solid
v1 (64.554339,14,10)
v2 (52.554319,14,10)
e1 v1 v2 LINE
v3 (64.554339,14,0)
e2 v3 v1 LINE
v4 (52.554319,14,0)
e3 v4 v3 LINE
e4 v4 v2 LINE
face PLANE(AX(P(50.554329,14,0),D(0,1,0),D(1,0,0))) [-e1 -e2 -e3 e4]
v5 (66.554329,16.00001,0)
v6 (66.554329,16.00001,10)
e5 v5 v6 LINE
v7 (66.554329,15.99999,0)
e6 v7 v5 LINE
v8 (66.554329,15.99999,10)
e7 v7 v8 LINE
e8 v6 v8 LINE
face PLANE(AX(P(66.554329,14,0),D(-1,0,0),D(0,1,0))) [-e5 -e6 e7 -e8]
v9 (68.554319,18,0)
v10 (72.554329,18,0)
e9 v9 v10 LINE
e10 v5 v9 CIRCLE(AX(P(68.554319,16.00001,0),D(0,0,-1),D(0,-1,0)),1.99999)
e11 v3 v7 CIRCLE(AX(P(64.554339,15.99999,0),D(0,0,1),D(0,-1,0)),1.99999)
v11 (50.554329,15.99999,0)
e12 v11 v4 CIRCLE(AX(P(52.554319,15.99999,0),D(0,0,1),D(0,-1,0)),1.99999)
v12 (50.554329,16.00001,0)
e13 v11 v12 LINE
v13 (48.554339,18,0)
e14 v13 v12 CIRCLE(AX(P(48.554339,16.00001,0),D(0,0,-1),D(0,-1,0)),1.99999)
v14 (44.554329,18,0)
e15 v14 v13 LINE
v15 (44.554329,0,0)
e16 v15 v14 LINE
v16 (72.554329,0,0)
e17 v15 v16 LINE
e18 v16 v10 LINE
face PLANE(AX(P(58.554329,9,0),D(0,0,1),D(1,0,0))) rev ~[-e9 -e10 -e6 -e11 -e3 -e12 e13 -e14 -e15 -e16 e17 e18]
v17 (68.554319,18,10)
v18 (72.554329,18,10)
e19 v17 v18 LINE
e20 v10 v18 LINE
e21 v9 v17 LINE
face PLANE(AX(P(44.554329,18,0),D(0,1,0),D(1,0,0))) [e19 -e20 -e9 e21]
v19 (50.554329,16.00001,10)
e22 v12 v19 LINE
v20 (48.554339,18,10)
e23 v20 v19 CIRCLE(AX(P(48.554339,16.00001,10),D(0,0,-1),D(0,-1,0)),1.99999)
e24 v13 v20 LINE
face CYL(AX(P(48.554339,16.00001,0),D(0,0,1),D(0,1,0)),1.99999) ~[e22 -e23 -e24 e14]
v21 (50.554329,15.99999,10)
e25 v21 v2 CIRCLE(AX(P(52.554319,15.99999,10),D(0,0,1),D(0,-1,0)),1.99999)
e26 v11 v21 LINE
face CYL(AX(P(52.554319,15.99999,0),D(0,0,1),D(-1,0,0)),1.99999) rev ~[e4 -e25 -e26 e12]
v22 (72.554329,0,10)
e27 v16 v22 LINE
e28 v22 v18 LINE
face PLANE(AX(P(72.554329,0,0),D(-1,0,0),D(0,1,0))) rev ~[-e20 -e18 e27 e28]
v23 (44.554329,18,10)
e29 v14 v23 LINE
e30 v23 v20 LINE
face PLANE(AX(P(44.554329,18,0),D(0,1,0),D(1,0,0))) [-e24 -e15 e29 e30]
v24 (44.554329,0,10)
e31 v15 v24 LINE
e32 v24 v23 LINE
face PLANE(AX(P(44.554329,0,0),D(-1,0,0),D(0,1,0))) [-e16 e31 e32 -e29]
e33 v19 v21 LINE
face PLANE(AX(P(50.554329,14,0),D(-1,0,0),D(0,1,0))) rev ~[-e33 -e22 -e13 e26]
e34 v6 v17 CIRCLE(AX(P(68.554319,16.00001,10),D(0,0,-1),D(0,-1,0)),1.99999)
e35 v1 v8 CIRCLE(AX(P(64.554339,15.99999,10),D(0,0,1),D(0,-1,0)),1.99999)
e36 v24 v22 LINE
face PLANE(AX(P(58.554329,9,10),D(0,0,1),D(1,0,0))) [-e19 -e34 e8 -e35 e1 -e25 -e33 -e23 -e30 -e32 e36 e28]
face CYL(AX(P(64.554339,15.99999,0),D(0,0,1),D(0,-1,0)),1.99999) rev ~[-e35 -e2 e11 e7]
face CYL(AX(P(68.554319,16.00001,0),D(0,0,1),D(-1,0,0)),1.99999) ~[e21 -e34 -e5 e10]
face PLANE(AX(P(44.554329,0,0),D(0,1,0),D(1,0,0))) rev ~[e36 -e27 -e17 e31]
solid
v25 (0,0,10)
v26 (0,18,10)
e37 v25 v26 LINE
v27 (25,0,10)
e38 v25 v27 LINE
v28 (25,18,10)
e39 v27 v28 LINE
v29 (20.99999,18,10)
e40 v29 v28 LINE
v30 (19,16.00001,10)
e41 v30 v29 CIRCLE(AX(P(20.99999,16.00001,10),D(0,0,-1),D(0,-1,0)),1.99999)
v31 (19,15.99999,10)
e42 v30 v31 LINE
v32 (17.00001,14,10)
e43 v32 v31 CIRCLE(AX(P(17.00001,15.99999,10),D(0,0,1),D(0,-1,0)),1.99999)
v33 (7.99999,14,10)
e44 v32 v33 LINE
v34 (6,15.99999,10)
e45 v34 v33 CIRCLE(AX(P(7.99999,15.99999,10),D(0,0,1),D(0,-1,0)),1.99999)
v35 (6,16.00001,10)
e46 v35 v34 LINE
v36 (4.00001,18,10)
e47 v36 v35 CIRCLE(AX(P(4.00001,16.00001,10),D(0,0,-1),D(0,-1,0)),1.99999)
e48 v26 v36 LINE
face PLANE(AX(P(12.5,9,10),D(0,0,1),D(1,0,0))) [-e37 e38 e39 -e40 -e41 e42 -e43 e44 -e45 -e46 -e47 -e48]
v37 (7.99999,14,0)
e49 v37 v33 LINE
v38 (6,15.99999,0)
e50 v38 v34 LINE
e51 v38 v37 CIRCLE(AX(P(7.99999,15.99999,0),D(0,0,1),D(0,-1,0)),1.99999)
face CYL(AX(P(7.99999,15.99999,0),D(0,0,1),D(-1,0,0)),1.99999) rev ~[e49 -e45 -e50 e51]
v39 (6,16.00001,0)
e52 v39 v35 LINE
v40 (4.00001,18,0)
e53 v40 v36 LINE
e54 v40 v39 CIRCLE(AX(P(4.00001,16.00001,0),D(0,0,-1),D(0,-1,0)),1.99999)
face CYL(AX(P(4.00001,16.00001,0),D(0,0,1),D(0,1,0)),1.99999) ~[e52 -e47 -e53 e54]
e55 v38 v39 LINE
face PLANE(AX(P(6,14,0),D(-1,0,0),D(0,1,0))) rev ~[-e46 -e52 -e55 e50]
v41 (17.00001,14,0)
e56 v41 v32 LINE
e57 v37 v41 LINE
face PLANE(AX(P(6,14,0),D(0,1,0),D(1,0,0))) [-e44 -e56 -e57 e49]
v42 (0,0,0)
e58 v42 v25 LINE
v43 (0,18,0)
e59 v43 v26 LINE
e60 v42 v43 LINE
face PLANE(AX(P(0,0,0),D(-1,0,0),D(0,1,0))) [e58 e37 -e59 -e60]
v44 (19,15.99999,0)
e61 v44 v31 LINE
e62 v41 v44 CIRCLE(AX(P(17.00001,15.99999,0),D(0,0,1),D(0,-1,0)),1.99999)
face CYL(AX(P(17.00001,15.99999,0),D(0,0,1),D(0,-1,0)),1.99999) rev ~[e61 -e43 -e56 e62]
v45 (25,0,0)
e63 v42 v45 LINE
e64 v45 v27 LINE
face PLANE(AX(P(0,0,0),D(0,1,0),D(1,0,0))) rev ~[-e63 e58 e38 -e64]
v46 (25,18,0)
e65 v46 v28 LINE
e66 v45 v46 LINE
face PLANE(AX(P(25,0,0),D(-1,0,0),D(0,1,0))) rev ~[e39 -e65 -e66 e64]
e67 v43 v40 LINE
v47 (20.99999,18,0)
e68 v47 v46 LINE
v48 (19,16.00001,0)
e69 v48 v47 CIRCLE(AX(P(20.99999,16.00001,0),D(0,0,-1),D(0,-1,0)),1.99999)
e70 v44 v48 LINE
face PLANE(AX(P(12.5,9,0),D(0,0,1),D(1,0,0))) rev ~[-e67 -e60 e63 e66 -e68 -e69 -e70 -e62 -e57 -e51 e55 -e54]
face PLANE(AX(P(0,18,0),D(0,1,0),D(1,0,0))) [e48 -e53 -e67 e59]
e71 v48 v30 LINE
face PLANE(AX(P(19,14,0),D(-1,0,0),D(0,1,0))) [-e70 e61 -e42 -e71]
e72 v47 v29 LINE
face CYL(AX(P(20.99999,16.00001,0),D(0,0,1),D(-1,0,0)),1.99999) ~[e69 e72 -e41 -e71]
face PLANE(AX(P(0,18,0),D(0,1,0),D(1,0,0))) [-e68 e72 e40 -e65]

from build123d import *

# Parameters (mm, degrees)
F0_W     = 25
F0_H     = 18
F1_DEPTH = 10
F2_W     = 13
F2_H     = 4
F3_DEPTH = 10.001
F4_W     = 28
F4_H     = 18
F5_DEPTH = 10
F6_W     = 16
F6_H     = 4
F7_DEPTH = 10.001
F8_R     = 1.99999
F8_2_R   = 1.99999


# Not quite as in the source:
# - a fillet or chamfer is up to 0.001 mm smaller than in the source, because OpenCascade refuses the exact size


with BuildPart() as f1:
    # F0 (on Top) → F1 (new body)
    with BuildSketch(Plane.XY):
        with Locations((12.5, 9)):
            Rectangle(F0_W, F0_H)
    extrude(amount=F1_DEPTH)

    # F2 (on Top) → F3 (cut, through all)
    with BuildSketch(Plane.XY):
        with Locations((12.5, 16)):
            Rectangle(F2_W, F2_H)
    extrude(amount=F3_DEPTH, mode=Mode.SUBTRACT)

    # F8 (radius 2 in the source; OpenCascade refuses exactly that, so slightly less here)
    f8_edges = [f1.edges().sort_by_distance(p)[0] for p in [
        (6, 14, 5),
        (19, 14, 5),
        (6, 18, 5),
        (19, 18, 5),
    ]]
    fillet(f8_edges, radius=F8_R)


with BuildPart() as f5:
    # F4 (on Top) → F5 (new body)
    with BuildSketch(Plane.XY):
        with Locations((58.5543287322, 9)):
            Rectangle(F4_W, F4_H)
    extrude(amount=F5_DEPTH)

    # F6 (on Top) → F7 (cut, through all)
    with BuildSketch(Plane.XY):
        with Locations((58.5543287322, 16)):
            Rectangle(F6_W, F6_H)
    extrude(amount=F7_DEPTH, mode=Mode.SUBTRACT)

    # F8#2 (radius 2 in the source; OpenCascade refuses exactly that, so slightly less here)
    f8_2_edges = [f5.edges().sort_by_distance(p)[0] for p in [
        (50.554329, 18, 5),
        (50.554329, 14, 5),
        (66.554329, 14, 5),
        (66.554329, 18, 5),
    ]]
    fillet(f8_2_edges, radius=F8_2_R)


solid = Compound([f1.part, f5.part])
